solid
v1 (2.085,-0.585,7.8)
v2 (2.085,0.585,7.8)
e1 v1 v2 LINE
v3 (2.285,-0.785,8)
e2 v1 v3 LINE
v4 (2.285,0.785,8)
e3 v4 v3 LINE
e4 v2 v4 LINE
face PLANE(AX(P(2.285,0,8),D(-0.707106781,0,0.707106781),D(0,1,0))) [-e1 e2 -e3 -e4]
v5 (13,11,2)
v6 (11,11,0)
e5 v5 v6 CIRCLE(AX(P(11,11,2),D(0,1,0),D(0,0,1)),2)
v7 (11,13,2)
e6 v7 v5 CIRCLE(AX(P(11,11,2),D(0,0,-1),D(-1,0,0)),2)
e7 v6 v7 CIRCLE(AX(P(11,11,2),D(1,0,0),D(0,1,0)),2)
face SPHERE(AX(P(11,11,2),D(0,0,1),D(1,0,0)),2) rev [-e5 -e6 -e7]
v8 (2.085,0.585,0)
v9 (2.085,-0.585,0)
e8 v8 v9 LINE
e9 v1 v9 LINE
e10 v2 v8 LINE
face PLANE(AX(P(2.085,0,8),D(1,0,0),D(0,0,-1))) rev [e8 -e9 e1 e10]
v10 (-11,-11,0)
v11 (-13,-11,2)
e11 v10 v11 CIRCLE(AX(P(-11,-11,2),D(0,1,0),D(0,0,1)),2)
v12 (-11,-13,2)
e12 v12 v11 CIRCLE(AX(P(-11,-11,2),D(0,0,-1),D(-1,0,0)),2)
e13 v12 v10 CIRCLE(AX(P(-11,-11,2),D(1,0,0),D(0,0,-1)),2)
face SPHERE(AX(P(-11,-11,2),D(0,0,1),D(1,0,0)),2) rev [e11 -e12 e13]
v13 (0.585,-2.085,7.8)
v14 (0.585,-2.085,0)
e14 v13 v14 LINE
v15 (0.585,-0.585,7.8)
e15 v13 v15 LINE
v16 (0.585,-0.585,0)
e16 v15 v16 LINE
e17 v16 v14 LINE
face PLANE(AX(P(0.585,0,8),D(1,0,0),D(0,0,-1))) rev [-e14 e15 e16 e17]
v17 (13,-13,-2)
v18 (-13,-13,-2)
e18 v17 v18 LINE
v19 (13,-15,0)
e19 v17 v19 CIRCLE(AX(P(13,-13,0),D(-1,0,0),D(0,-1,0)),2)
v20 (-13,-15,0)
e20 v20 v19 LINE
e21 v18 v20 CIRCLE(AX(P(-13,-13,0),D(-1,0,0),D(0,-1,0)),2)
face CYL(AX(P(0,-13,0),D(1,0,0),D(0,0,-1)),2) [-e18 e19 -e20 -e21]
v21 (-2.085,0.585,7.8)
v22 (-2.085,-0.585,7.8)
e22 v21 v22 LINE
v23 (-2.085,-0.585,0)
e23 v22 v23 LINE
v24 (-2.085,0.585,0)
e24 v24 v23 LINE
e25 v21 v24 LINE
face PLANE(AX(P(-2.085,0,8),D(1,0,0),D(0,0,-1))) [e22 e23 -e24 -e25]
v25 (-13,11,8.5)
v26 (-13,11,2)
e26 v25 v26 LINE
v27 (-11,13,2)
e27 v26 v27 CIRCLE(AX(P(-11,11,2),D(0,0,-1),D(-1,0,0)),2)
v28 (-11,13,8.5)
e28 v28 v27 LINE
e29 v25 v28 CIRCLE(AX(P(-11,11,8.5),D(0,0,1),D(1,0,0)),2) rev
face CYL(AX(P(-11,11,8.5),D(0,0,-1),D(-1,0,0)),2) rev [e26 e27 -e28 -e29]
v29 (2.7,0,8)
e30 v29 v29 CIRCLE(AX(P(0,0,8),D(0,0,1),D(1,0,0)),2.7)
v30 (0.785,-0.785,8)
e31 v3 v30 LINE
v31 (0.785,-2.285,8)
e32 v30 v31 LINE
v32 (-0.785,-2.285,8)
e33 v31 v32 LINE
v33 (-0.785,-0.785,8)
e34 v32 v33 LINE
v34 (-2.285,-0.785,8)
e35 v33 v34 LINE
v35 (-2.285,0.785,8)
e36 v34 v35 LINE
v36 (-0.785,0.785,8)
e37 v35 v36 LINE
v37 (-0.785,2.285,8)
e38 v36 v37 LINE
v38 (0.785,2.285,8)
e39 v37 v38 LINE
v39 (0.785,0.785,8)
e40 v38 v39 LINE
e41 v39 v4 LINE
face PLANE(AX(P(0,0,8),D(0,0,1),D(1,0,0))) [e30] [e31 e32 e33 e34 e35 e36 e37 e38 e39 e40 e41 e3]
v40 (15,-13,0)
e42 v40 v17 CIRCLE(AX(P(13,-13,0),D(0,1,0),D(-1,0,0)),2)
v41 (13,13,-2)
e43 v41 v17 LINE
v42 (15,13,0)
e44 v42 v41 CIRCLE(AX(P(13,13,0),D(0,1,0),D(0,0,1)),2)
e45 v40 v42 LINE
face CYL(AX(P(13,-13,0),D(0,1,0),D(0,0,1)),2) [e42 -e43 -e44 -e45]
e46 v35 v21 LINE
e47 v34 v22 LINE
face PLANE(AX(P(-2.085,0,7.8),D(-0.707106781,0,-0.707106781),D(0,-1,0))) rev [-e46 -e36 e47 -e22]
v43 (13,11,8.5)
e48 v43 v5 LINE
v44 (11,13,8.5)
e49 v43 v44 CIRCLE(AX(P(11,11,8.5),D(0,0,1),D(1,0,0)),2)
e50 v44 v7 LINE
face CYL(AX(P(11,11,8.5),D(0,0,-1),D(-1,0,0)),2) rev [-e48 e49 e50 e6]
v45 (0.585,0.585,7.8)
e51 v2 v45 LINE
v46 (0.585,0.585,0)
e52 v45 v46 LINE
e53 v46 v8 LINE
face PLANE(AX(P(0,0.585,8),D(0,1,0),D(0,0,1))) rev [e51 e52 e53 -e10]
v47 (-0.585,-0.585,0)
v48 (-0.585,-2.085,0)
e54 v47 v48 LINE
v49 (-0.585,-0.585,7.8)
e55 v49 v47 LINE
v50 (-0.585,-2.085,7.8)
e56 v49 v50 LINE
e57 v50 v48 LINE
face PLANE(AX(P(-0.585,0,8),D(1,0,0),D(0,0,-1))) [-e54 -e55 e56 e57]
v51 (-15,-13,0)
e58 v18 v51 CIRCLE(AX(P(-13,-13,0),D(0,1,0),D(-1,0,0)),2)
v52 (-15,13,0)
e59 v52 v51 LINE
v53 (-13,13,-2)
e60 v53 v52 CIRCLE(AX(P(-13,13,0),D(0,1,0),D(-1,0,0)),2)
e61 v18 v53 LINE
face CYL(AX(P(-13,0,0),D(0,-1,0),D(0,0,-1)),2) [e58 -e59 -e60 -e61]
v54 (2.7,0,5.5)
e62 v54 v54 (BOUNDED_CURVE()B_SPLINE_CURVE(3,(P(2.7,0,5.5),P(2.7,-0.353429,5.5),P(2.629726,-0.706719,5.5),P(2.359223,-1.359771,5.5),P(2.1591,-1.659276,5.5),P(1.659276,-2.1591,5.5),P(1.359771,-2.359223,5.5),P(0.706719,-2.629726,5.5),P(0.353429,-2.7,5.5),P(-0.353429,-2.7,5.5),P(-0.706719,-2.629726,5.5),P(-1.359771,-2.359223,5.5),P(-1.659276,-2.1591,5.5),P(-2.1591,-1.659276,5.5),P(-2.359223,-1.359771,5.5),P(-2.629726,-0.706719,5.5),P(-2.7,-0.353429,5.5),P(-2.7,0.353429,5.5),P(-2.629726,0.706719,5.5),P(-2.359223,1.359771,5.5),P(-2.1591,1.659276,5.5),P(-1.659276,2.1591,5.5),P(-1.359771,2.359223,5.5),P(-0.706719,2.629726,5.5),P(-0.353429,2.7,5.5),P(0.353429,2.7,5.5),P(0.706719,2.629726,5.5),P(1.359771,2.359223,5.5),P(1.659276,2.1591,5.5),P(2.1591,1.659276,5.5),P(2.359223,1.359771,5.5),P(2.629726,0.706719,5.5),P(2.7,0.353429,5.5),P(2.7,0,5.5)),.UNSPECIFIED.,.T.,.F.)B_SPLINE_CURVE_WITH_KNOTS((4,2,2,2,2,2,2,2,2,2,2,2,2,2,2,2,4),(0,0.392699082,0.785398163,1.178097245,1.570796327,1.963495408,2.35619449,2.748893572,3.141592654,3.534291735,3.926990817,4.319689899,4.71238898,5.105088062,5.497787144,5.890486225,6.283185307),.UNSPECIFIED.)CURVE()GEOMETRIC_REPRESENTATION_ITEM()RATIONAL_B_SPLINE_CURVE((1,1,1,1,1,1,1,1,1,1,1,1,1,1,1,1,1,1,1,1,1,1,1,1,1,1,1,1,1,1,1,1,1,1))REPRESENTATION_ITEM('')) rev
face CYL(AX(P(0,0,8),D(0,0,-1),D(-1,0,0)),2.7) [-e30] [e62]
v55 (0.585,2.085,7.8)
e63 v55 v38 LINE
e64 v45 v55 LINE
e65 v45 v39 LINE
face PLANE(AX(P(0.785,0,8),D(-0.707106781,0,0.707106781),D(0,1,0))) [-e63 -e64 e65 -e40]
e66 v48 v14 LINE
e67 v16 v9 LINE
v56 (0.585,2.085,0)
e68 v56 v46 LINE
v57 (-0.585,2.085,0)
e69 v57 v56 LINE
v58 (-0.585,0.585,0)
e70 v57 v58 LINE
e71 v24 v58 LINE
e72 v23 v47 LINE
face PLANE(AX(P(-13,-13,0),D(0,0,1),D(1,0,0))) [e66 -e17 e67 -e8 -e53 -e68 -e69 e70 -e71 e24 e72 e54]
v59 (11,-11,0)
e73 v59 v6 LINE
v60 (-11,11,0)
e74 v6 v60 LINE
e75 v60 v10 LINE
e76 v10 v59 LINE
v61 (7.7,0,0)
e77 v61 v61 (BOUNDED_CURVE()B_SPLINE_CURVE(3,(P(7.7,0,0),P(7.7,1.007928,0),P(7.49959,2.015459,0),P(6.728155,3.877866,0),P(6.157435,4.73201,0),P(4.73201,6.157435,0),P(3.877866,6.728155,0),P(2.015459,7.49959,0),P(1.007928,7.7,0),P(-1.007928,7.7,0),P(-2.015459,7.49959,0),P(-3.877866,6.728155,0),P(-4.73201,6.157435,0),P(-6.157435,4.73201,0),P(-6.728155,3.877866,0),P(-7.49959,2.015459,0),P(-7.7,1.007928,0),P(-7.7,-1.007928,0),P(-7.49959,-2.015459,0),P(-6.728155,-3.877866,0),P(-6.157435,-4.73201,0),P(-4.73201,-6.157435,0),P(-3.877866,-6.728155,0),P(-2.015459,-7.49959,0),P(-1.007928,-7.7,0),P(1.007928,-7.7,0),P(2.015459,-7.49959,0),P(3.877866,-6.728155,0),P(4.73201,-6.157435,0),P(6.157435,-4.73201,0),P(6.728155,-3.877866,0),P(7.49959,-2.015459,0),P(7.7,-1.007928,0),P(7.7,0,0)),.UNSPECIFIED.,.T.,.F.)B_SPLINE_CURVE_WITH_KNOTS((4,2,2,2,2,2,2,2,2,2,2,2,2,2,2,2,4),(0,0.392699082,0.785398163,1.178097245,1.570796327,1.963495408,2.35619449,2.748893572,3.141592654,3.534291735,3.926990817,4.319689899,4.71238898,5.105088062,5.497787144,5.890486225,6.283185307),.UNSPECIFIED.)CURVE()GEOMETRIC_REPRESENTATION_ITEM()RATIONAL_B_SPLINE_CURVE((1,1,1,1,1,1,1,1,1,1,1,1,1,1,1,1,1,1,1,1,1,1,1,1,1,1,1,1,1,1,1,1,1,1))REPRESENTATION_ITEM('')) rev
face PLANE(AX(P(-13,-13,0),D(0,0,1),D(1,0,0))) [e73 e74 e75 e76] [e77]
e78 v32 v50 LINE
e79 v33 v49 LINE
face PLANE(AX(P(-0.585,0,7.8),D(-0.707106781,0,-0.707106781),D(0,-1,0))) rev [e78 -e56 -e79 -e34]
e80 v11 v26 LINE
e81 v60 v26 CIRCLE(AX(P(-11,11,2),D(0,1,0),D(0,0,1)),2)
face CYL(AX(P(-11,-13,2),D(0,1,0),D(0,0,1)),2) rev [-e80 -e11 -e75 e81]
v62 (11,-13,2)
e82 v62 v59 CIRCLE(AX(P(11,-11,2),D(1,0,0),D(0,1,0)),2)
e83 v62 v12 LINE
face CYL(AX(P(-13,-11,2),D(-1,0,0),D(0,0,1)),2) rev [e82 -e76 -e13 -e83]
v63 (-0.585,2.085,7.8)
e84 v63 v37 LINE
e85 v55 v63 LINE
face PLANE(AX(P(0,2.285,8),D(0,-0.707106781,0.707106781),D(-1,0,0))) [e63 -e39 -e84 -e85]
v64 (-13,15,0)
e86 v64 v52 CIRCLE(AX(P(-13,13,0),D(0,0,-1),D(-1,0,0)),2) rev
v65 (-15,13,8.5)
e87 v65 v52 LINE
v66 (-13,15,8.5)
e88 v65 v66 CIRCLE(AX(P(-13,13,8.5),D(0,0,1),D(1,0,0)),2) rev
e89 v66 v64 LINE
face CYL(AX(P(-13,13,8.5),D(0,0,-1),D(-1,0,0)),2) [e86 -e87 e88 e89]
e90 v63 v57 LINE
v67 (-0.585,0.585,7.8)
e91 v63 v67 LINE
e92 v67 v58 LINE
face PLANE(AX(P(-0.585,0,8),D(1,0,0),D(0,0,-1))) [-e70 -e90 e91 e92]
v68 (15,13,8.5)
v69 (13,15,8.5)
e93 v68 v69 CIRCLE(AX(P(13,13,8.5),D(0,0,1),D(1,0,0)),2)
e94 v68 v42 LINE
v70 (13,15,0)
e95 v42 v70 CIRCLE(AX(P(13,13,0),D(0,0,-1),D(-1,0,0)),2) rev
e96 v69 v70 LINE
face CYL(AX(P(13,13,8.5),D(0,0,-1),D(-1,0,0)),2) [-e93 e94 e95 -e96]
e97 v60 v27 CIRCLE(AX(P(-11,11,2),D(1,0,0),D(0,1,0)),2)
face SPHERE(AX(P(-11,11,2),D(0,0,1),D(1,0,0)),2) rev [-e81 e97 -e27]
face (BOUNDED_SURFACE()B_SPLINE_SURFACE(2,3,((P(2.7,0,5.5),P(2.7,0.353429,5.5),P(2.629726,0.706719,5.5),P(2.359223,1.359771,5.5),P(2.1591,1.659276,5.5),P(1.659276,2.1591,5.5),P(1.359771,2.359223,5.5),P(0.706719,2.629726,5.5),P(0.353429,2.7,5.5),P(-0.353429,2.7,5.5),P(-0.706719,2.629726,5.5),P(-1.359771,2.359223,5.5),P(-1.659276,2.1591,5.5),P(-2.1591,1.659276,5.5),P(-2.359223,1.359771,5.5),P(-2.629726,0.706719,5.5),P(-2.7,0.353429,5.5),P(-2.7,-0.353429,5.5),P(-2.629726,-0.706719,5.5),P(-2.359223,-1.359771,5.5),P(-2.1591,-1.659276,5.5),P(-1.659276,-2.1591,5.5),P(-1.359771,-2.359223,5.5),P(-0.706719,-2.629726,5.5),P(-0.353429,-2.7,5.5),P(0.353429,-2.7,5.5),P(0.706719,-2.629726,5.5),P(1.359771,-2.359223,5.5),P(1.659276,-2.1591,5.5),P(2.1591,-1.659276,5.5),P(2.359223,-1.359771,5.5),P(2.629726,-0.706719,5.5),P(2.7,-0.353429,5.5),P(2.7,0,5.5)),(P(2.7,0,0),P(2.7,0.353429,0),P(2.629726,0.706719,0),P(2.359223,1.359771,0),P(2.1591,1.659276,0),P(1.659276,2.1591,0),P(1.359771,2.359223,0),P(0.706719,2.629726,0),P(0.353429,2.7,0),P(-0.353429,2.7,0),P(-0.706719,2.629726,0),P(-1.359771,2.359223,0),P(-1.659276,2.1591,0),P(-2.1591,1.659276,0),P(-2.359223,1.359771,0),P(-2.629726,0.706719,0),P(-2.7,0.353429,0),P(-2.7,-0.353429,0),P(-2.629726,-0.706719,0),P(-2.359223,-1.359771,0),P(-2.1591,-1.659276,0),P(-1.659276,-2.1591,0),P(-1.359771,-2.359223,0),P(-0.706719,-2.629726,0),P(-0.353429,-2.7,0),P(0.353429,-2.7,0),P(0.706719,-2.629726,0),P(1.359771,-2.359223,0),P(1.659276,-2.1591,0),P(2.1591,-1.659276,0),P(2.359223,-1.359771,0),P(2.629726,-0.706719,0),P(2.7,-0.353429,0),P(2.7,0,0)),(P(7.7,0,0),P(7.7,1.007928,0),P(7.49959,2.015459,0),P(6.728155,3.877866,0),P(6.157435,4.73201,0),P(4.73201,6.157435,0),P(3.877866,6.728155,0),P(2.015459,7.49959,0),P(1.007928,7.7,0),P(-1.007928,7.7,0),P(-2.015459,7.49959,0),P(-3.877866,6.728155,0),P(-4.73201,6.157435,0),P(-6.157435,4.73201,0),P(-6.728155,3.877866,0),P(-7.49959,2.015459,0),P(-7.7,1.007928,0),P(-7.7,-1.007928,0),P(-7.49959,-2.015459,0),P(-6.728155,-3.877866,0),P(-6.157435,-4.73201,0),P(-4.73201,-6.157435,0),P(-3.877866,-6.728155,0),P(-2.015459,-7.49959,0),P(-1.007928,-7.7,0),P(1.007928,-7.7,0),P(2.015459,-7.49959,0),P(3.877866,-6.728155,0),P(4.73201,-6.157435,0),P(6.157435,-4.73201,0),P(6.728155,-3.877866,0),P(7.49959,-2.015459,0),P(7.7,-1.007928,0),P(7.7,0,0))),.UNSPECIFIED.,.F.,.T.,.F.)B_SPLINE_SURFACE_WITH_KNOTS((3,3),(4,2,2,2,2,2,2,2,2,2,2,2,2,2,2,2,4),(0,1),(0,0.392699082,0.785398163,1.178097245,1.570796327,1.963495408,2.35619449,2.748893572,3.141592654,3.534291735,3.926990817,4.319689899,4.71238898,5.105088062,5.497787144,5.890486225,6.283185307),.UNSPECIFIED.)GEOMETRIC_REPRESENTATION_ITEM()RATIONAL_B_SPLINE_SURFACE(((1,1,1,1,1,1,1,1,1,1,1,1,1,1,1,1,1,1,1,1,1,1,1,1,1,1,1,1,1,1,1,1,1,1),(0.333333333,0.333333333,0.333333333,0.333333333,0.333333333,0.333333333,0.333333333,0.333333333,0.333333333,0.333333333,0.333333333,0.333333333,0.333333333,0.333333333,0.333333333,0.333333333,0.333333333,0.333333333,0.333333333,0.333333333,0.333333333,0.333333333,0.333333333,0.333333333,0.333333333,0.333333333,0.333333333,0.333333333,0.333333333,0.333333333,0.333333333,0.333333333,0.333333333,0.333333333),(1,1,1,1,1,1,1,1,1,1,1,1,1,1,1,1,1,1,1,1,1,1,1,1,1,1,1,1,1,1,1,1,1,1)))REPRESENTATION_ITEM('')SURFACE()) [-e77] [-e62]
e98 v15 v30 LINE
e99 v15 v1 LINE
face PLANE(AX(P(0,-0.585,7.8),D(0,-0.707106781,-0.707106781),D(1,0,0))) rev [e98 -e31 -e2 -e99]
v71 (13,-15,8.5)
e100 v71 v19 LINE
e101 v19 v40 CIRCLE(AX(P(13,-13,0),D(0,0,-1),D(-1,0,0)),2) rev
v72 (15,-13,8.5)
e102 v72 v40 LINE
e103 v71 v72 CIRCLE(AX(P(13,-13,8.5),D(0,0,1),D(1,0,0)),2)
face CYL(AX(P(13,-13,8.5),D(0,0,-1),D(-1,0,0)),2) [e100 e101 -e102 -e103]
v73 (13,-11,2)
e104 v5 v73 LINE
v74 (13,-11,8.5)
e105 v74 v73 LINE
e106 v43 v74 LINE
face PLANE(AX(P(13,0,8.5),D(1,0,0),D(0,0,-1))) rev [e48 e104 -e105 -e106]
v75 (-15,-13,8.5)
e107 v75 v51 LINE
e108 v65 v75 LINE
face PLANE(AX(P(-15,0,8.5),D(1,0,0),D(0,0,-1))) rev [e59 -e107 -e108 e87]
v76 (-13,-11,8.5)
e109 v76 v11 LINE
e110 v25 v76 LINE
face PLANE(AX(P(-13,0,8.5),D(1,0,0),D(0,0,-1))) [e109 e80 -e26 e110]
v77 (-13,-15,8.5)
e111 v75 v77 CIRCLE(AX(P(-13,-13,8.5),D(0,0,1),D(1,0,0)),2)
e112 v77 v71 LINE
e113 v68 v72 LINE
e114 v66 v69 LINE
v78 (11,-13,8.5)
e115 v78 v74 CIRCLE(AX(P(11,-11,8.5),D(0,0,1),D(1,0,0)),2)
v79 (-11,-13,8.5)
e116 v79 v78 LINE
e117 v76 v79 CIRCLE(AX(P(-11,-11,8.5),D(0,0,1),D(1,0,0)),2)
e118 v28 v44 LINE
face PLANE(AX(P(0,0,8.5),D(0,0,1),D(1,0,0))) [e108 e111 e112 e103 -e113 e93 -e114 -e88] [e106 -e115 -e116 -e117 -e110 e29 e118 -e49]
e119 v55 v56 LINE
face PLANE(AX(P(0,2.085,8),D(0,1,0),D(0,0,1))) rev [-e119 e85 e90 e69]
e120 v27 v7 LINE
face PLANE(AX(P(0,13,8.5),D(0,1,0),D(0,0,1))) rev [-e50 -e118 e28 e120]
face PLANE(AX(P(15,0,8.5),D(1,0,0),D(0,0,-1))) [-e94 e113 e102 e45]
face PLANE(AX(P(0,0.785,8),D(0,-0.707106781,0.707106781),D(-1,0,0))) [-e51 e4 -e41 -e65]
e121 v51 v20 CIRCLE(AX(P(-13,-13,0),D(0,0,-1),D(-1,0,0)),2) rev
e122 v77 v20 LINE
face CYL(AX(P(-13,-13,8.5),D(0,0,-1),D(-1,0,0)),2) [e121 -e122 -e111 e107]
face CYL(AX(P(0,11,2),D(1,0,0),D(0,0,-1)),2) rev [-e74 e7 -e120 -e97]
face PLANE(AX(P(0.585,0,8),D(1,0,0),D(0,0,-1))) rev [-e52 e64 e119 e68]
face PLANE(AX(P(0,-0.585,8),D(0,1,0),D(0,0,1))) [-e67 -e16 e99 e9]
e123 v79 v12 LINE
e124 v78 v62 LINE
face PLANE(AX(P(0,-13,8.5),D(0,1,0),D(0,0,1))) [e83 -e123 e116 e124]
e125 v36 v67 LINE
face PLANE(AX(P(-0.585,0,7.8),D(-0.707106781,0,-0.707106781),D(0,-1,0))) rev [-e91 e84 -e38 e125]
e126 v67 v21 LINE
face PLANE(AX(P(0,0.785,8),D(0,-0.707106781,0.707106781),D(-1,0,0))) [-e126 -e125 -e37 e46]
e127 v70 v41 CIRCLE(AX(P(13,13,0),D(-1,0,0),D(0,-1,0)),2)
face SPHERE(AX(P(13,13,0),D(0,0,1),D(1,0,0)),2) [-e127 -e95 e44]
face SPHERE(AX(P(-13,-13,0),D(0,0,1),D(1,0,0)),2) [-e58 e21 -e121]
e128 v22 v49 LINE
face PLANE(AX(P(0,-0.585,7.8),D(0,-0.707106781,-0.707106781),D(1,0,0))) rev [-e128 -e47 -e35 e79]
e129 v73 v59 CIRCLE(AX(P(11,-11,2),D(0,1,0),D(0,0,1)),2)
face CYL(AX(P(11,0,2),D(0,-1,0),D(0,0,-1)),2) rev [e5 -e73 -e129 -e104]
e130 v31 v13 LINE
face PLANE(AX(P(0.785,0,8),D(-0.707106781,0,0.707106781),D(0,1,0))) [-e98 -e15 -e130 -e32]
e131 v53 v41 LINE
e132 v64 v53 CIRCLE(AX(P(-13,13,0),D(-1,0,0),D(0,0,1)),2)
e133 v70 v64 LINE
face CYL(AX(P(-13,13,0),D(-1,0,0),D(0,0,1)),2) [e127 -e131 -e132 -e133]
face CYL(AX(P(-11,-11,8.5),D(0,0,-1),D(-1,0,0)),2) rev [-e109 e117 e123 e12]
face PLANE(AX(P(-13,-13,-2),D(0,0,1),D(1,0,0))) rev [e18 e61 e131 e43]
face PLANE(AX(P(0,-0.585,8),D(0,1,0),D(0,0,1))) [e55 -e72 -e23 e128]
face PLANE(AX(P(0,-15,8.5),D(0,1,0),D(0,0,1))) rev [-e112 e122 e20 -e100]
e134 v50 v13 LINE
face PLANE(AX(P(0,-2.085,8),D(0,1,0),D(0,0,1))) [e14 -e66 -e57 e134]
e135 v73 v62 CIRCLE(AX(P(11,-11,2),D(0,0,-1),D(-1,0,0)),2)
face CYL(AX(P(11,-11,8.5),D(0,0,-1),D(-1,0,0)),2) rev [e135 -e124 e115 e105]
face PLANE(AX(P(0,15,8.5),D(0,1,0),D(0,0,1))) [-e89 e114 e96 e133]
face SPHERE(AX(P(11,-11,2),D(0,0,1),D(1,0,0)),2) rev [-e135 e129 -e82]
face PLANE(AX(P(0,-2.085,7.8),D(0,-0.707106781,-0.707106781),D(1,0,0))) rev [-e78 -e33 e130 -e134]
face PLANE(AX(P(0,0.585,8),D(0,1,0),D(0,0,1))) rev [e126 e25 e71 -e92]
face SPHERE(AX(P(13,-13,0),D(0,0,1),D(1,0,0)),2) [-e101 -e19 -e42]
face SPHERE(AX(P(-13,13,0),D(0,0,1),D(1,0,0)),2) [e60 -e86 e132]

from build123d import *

# Parameters (mm, degrees)
EXTRUDE_1_DEPTH = 8.5
SKETCH_1_6_R    = 2.7
EXTRUDE_2_DEPTH = 8
EXTRUDE_START   = -2
EXTRUDE_3_DEPTH = 2
FILLET_1_R      = 2
CHAMFER_1_SIZE  = 0.2
FILLET_2_R      = 2
FILLET_3_SIZE   = 5
FILLET_3_SIZE_2 = 5.5


with BuildPart() as part:
    # 草图1 → 凸台-拉伸1 (new body)
    with BuildSketch(Plane.XY):
        with BuildLine():
            ThreePointArc((-15, 13), (-14.414213562, 14.414213562), (-13, 15))
            Line((-13, 15), (13, 15))
            ThreePointArc((13, 15), (14.414213562, 14.414213562), (15, 13))
            Line((15, 13), (15, -13))
            ThreePointArc((15, -13), (14.414213562, -14.414213562), (13, -15))
            Line((13, -15), (-13, -15))
            ThreePointArc((-13, -15), (-14.414213562, -14.414213562), (-15, -13))
            Line((-15, -13), (-15, 13))
        make_face()
        with BuildLine():
            ThreePointArc((-13, -11), (-12.414213562, -12.414213562), (-11, -13))
            Line((-11, -13), (11, -13))
            ThreePointArc((11, -13), (12.414213562, -12.414213562), (13, -11))
            Line((13, -11), (13, 11))
            ThreePointArc((13, 11), (12.414213562, 12.414213562), (11, 13))
            Line((11, 13), (-11, 13))
            ThreePointArc((-11, 13), (-12.414213562, 12.414213562), (-13, 11))
            Line((-13, 11), (-13, -11))
        make_face(mode=Mode.SUBTRACT)
    extrude(amount=EXTRUDE_1_DEPTH)



with BuildPart() as body_2:
    # 草图1<6> → 凸台-拉伸2 (new body)
    with BuildSketch(Plane.XY):
        Circle(SKETCH_1_6_R)
        Polygon((-2.085, -0.585), (-2.085, 0.585), (-0.585, 0.585), (-0.585, 2.085), (0.585, 2.085), (0.585, 0.585), (2.085, 0.585), (2.085, -0.585), (0.585, -0.585), (0.585, -2.085), (-0.585, -2.085), (-0.585, -0.585), align=None, mode=Mode.SUBTRACT)
    extrude(amount=EXTRUDE_2_DEPTH)


with BuildPart() as part_1:
    add(part.part)

    add(body_2.part)  # 凸台-拉伸3 merges body 2
    # 草图1<7> → 凸台-拉伸3 (add)
    with BuildSketch(Plane.XY.offset(EXTRUDE_START)):
        with BuildLine():
            Line((-13, 15), (13, 15))
            ThreePointArc((13, 15), (14.414213562, 14.414213562), (15, 13))
            Line((15, 13), (15, -13))
            ThreePointArc((15, -13), (14.414213562, -14.414213562), (13, -15))
            Line((13, -15), (-13, -15))
            ThreePointArc((-13, -15), (-14.414213562, -14.414213562), (-15, -13))
            Line((-15, -13), (-15, 13))
            ThreePointArc((-15, 13), (-14.414213562, 14.414213562), (-13, 15))
        make_face()
    extrude(amount=EXTRUDE_3_DEPTH)

    # 圆角1
    fillet_1_edges = [part_1.edges().sort_by_distance(p)[0] for p in [
        (-14.414213562, -14.414213562, -2),
        (-15, 0, -2),
        (14.414213562, 14.414213562, -2),
        (14.414213562, -14.414213562, -2),
        (0, -15, -2),
        (-14.414213562, 14.414213562, -2),
        (0, 15, -2),
        (15, 0, -2),
    ]]
    fillet(fillet_1_edges, radius=FILLET_1_R)

    # 倒角1
    chamfer_1_edges = [part_1.edges().sort_by_distance(p)[0] for p in [
        (1.335, -0.585, 8),
        (0, -2.085, 8),
        (-0.585, -1.335, 8),
        (-1.335, -0.585, 8),
        (-2.085, 0, 8),
        (-0.585, 1.335, 8),
        (0, 2.085, 8),
        (0.585, 1.335, 8),
        (1.335, 0.585, 8),
        (2.085, 0, 8),
        (0.585, -1.335, 8),
        (-1.335, 0.585, 8),
    ]]
    chamfer(chamfer_1_edges, length=CHAMFER_1_SIZE)

    # 圆角2
    fillet_2_edges = [part_1.edges().sort_by_distance(p)[0] for p in [
        (0, -13, 0),
        (12.414213562, -12.414213562, 0),
        (13, 0, 0),
        (12.414213562, 12.414213562, 0),
        (0, 13, 0),
        (-12.414213562, 12.414213562, 0),
        (-13, 0, 0),
        (-12.414213562, -12.414213562, 0),
    ]]
    fillet(fillet_2_edges, radius=FILLET_2_R)

    # 圆角3
    # a fillet whose section is not a circle: 5.5, 5 mm, written as the material it adds along each edge
    with BuildSketch(Plane(origin=(0, 0, 0), x_dir=(1, 0, 0), z_dir=(0, -1, 0))) as fillet_3_piece_1:
        with BuildLine():
            Bezier((2.7 + FILLET_3_SIZE, 0), (2.7, 0), (2.7, FILLET_3_SIZE_2), weights=[1, 0.333333333, 1])
            Line((2.7, FILLET_3_SIZE_2), (2.7, 0))
            Line((2.7, 0), (2.7 + FILLET_3_SIZE, 0))
        make_face()
    revolve(axis=Axis((0, 0, 0), (0, 0, 1)))


solid = part_1.part
